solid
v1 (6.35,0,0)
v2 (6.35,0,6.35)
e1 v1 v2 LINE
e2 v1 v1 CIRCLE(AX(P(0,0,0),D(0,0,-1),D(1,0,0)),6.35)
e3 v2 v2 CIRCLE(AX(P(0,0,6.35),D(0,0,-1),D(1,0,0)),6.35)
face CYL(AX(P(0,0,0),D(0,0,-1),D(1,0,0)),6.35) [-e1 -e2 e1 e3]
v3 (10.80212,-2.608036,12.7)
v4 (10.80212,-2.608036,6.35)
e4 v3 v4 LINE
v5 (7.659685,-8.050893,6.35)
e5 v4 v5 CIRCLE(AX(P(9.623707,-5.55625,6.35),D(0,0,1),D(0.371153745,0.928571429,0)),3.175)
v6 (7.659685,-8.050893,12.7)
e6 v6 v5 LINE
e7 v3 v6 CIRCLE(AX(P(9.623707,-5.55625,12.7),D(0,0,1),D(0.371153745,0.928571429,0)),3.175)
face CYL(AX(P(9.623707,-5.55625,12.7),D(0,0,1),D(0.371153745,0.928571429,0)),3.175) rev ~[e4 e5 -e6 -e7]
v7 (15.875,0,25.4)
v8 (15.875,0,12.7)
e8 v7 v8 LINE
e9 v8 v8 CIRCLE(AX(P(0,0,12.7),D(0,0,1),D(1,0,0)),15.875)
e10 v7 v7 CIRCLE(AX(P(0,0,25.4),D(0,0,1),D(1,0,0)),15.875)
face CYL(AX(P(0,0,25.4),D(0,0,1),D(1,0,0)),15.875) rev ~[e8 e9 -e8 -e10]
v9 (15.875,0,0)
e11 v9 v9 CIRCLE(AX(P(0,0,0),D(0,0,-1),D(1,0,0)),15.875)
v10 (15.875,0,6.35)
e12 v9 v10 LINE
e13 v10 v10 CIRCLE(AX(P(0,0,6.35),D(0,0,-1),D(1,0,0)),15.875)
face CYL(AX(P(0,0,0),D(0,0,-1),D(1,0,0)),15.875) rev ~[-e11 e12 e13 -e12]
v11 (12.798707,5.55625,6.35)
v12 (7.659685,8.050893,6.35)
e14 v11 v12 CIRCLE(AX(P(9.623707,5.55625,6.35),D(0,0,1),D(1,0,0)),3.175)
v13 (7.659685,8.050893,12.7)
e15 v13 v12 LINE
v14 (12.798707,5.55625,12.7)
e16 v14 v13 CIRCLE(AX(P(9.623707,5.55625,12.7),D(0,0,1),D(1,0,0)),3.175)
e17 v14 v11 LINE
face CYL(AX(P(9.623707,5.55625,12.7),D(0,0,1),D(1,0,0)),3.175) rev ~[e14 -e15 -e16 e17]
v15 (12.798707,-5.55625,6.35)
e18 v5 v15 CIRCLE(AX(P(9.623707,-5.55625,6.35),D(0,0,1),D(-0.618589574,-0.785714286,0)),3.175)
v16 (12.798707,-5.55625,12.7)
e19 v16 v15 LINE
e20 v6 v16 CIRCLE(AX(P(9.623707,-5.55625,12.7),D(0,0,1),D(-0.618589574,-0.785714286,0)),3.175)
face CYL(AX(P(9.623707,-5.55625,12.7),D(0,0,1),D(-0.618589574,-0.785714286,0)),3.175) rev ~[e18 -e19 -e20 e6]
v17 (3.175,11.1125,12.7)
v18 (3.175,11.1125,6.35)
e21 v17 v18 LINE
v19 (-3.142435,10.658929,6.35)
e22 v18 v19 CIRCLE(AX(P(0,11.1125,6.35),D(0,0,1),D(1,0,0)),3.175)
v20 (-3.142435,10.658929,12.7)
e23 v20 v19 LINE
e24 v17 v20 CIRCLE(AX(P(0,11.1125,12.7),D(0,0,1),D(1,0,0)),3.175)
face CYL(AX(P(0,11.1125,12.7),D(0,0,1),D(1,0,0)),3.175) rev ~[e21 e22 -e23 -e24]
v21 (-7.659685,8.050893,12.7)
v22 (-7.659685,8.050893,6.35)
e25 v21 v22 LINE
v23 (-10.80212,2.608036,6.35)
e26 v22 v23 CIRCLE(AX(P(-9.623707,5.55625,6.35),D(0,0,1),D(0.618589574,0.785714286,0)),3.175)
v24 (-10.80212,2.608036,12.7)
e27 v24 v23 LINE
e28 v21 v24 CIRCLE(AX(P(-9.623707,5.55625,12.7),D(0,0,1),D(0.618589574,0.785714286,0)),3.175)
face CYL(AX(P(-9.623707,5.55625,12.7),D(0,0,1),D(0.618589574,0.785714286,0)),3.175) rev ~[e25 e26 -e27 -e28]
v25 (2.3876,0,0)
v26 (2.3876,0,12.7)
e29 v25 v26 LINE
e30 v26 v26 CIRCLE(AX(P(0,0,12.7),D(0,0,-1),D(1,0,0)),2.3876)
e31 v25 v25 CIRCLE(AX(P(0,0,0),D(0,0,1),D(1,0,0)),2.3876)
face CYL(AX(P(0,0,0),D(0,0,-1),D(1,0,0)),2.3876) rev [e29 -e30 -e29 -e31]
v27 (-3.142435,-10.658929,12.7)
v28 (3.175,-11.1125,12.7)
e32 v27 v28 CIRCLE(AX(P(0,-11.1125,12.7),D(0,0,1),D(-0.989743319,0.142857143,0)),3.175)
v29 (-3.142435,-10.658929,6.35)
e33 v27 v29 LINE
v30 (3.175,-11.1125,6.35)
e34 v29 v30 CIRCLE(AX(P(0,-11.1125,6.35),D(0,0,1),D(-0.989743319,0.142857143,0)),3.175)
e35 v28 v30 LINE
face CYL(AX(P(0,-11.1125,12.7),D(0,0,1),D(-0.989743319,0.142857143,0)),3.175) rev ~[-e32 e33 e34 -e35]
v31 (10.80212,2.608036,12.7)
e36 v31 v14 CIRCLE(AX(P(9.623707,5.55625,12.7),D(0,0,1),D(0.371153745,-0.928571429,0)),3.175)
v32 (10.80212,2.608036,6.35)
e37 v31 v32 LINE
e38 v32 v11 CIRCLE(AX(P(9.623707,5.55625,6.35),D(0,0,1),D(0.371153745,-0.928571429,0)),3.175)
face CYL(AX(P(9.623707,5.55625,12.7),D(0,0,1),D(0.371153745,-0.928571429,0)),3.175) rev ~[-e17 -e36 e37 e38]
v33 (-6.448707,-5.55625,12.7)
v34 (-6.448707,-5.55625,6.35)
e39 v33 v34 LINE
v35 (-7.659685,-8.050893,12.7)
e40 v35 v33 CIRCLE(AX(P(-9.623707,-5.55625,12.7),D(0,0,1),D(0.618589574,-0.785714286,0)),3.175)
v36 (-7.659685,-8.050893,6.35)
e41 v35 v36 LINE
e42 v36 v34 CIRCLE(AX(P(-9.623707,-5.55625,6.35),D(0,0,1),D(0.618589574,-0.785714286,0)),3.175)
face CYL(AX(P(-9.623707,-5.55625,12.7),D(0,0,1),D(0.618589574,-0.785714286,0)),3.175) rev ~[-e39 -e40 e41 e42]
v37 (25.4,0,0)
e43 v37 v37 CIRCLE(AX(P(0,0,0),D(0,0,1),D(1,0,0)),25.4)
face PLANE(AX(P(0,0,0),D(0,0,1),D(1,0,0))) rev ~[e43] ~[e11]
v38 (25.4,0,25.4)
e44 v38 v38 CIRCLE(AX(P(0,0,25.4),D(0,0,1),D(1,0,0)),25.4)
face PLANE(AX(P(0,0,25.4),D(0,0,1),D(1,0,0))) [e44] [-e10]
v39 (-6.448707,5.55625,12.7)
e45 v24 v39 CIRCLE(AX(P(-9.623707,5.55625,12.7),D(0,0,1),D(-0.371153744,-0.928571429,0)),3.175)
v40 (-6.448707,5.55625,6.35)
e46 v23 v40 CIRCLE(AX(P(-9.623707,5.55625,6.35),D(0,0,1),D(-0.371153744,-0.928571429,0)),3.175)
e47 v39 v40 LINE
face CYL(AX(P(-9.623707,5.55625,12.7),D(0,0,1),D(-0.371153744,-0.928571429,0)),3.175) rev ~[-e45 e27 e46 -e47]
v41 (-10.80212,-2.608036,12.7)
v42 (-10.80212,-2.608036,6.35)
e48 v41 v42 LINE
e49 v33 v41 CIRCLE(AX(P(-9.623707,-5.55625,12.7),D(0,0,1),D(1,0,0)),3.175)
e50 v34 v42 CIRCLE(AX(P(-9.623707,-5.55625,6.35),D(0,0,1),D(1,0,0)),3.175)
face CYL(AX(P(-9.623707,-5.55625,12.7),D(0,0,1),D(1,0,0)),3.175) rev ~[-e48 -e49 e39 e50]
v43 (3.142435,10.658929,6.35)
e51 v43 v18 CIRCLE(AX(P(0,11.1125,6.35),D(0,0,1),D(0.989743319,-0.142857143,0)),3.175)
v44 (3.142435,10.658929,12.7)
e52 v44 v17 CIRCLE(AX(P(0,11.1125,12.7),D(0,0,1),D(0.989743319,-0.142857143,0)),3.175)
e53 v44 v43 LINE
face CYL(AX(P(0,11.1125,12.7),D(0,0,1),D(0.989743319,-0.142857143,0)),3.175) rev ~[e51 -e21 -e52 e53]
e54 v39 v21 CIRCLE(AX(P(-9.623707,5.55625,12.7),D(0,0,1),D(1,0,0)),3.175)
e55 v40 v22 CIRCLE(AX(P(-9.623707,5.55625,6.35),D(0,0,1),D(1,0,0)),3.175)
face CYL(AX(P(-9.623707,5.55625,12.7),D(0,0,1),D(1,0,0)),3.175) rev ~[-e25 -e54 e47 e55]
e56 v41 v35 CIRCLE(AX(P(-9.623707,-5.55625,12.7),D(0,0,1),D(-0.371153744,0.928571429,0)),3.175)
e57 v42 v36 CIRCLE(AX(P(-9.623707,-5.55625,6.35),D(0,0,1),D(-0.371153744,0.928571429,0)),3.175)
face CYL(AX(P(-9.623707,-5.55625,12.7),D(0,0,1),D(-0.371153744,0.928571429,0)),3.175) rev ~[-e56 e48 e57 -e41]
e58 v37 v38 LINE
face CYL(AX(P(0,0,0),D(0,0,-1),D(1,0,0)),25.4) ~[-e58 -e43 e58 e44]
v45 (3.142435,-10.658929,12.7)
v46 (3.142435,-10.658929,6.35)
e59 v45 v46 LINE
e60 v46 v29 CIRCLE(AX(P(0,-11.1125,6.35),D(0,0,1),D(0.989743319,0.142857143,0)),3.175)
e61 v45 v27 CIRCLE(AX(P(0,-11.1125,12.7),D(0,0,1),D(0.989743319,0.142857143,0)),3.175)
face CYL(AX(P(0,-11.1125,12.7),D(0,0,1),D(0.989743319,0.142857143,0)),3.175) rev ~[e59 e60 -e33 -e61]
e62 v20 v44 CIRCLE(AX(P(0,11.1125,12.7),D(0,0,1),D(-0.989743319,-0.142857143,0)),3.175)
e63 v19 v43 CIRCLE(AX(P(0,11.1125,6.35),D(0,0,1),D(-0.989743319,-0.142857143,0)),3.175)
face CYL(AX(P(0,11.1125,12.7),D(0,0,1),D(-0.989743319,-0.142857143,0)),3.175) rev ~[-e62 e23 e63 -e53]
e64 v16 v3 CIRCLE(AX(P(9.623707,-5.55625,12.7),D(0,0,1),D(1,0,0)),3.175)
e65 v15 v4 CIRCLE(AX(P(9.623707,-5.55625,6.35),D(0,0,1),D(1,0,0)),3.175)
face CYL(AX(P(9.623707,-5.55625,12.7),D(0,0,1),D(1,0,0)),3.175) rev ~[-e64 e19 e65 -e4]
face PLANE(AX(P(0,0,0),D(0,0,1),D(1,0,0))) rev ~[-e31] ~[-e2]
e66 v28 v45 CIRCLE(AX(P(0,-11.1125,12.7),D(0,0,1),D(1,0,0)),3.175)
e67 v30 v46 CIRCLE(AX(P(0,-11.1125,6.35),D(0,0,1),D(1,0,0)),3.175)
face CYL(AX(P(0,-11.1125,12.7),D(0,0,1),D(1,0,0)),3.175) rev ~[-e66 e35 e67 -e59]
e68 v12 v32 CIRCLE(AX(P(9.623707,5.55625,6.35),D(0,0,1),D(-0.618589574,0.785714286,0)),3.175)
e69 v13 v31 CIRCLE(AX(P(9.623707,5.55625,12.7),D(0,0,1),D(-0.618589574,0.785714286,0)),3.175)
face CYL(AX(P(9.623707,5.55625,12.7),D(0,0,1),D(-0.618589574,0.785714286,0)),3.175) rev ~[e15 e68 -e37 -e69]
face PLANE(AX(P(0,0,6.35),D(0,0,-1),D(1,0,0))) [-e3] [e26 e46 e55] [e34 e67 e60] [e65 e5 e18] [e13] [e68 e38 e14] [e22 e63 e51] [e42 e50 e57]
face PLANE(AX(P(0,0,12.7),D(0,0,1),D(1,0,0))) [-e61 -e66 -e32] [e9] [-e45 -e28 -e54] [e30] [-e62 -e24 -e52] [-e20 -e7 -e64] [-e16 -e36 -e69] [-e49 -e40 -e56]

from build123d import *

# Parameters (mm, degrees)
F0_R     = 25.4
F0_R_2   = 2.3876
F1_DEPTH = 25.4
F2_R     = 15.875
F3_DEPTH = 12.7
F4_R     = 15.875
F4_R_2   = 6.35
F5_DEPTH = 6.35
F6_R     = 2.3876
F7_DEPTH = 12.701


with BuildPart() as f1:
    # F0 (on Top) → F1 (new body)
    with BuildSketch(Plane.XY):
        Circle(F0_R)
        Circle(F0_R_2, mode=Mode.SUBTRACT)
    extrude(amount=F1_DEPTH)

    # F2 (on face) → F3 (cut)
    with BuildSketch(Plane.XY.offset(25.4)):
        Circle(F2_R)
    extrude(amount=-F3_DEPTH, mode=Mode.SUBTRACT)

    # F4 (on face) → F5 (cut)
    with BuildSketch(Plane(origin=(0, 0, 0), x_dir=(1, 0, 0), z_dir=(0, 0, -1))):
        Circle(F4_R)
        Circle(F4_R_2, mode=Mode.SUBTRACT)
    extrude(amount=-F5_DEPTH, mode=Mode.SUBTRACT)

    # F6 (on face) → F7 (cut, through all)
    with BuildSketch(Plane.XY.offset(12.7)):
        with BuildLine():
            ThreePointArc((7.6596854017, 8.0508928571), (6.8740766425, 3.96875), (10.8021204383, 2.6080357143))
            ThreePointArc((10.8021204383, 2.6080357143), (9.6237072996, 5.55625), (7.6596854017, 8.0508928571))
        make_face()
        with BuildLine():
            ThreePointArc((7.6596854017, 8.0508928571), (9.6237072996, 5.55625), (10.8021204383, 2.6080357143))
            ThreePointArc((10.8021204383, 2.6080357143), (12.2525936337, 3.775918109), (12.7987072996, 5.55625))
            ThreePointArc((12.7987072996, 5.55625), (11.010223703, 8.4125058119), (7.6596854017, 8.0508928571))
        make_face()
        with BuildLine():
            ThreePointArc((12.7987072996, -5.55625), (12.2525936337, -3.775918109), (10.8021204383, -2.6080357143))
            ThreePointArc((10.8021204383, -2.6080357143), (9.6237072996, -5.55625), (7.6596854017, -8.0508928571))
            ThreePointArc((7.6596854017, -8.0508928571), (11.010223703, -8.4125058119), (12.7987072996, -5.55625))
        make_face()
        with BuildLine():
            ThreePointArc((7.6596854017, -8.0508928571), (9.6237072996, -5.55625), (10.8021204383, -2.6080357143))
            ThreePointArc((10.8021204383, -2.6080357143), (6.8740766425, -3.96875), (7.6596854017, -8.0508928571))
        make_face()
        with BuildLine():
            ThreePointArc((-3.1424350366, 10.6589285714), (0, 7.9375), (3.1424350366, 10.6589285714))
            ThreePointArc((3.1424350366, 10.6589285714), (0, 11.1125), (-3.1424350366, 10.6589285714))
        make_face()
        with BuildLine():
            ThreePointArc((-3.1424350366, 10.6589285714), (0, 11.1125), (3.1424350366, 10.6589285714))
            ThreePointArc((3.1424350366, 10.6589285714), (3.1668482945, 10.8851305222), (3.175, 11.1125))
            ThreePointArc((3.175, 11.1125), (-0.2273694778, 14.2793482945), (-3.1424350366, 10.6589285714))
        make_face()
        with BuildLine():
            ThreePointArc((3.175, -11.1125), (3.1668482945, -10.8851305222), (3.1424350366, -10.6589285714))
            ThreePointArc((3.1424350366, -10.6589285714), (0, -11.1125), (-3.1424350366, -10.6589285714))
            ThreePointArc((-3.1424350366, -10.6589285714), (-0.2273694778, -14.2793482945), (3.175, -11.1125))
        make_face()
        with BuildLine():
            ThreePointArc((-3.1424350366, -10.6589285714), (0, -11.1125), (3.1424350366, -10.6589285714))
            ThreePointArc((3.1424350366, -10.6589285714), (0, -7.9375), (-3.1424350366, -10.6589285714))
        make_face()
        with BuildLine():
            ThreePointArc((-6.4487072996, 5.55625), (-6.7674514877, 6.9427664035), (-7.6596854017, 8.0508928571))
            ThreePointArc((-7.6596854017, 8.0508928571), (-9.6237072996, 5.55625), (-10.8021204383, 2.6080357143))
            ThreePointArc((-10.8021204383, 2.6080357143), (-7.8433754085, 2.9273636659), (-6.4487072996, 5.55625))
        make_face()
        with BuildLine():
            ThreePointArc((-10.8021204383, 2.6080357143), (-9.6237072996, 5.55625), (-7.6596854017, 8.0508928571))
            ThreePointArc((-7.6596854017, 8.0508928571), (-12.3733379566, 7.14375), (-10.8021204383, 2.6080357143))
        make_face()
        with BuildLine():
            ThreePointArc((-10.8021204383, -2.6080357143), (-12.3733379566, -7.14375), (-7.6596854017, -8.0508928571))
            ThreePointArc((-7.6596854017, -8.0508928571), (-9.6237072996, -5.55625), (-10.8021204383, -2.6080357143))
        make_face()
        with BuildLine():
            ThreePointArc((-10.8021204383, -2.6080357143), (-9.6237072996, -5.55625), (-7.6596854017, -8.0508928571))
            ThreePointArc((-7.6596854017, -8.0508928571), (-6.7674514877, -6.9427664035), (-6.4487072996, -5.55625))
            ThreePointArc((-6.4487072996, -5.55625), (-7.8433754085, -2.9273636659), (-10.8021204383, -2.6080357143))
        make_face()
        Circle(F6_R)
    extrude(amount=-F7_DEPTH, mode=Mode.SUBTRACT)


solid = f1.part
